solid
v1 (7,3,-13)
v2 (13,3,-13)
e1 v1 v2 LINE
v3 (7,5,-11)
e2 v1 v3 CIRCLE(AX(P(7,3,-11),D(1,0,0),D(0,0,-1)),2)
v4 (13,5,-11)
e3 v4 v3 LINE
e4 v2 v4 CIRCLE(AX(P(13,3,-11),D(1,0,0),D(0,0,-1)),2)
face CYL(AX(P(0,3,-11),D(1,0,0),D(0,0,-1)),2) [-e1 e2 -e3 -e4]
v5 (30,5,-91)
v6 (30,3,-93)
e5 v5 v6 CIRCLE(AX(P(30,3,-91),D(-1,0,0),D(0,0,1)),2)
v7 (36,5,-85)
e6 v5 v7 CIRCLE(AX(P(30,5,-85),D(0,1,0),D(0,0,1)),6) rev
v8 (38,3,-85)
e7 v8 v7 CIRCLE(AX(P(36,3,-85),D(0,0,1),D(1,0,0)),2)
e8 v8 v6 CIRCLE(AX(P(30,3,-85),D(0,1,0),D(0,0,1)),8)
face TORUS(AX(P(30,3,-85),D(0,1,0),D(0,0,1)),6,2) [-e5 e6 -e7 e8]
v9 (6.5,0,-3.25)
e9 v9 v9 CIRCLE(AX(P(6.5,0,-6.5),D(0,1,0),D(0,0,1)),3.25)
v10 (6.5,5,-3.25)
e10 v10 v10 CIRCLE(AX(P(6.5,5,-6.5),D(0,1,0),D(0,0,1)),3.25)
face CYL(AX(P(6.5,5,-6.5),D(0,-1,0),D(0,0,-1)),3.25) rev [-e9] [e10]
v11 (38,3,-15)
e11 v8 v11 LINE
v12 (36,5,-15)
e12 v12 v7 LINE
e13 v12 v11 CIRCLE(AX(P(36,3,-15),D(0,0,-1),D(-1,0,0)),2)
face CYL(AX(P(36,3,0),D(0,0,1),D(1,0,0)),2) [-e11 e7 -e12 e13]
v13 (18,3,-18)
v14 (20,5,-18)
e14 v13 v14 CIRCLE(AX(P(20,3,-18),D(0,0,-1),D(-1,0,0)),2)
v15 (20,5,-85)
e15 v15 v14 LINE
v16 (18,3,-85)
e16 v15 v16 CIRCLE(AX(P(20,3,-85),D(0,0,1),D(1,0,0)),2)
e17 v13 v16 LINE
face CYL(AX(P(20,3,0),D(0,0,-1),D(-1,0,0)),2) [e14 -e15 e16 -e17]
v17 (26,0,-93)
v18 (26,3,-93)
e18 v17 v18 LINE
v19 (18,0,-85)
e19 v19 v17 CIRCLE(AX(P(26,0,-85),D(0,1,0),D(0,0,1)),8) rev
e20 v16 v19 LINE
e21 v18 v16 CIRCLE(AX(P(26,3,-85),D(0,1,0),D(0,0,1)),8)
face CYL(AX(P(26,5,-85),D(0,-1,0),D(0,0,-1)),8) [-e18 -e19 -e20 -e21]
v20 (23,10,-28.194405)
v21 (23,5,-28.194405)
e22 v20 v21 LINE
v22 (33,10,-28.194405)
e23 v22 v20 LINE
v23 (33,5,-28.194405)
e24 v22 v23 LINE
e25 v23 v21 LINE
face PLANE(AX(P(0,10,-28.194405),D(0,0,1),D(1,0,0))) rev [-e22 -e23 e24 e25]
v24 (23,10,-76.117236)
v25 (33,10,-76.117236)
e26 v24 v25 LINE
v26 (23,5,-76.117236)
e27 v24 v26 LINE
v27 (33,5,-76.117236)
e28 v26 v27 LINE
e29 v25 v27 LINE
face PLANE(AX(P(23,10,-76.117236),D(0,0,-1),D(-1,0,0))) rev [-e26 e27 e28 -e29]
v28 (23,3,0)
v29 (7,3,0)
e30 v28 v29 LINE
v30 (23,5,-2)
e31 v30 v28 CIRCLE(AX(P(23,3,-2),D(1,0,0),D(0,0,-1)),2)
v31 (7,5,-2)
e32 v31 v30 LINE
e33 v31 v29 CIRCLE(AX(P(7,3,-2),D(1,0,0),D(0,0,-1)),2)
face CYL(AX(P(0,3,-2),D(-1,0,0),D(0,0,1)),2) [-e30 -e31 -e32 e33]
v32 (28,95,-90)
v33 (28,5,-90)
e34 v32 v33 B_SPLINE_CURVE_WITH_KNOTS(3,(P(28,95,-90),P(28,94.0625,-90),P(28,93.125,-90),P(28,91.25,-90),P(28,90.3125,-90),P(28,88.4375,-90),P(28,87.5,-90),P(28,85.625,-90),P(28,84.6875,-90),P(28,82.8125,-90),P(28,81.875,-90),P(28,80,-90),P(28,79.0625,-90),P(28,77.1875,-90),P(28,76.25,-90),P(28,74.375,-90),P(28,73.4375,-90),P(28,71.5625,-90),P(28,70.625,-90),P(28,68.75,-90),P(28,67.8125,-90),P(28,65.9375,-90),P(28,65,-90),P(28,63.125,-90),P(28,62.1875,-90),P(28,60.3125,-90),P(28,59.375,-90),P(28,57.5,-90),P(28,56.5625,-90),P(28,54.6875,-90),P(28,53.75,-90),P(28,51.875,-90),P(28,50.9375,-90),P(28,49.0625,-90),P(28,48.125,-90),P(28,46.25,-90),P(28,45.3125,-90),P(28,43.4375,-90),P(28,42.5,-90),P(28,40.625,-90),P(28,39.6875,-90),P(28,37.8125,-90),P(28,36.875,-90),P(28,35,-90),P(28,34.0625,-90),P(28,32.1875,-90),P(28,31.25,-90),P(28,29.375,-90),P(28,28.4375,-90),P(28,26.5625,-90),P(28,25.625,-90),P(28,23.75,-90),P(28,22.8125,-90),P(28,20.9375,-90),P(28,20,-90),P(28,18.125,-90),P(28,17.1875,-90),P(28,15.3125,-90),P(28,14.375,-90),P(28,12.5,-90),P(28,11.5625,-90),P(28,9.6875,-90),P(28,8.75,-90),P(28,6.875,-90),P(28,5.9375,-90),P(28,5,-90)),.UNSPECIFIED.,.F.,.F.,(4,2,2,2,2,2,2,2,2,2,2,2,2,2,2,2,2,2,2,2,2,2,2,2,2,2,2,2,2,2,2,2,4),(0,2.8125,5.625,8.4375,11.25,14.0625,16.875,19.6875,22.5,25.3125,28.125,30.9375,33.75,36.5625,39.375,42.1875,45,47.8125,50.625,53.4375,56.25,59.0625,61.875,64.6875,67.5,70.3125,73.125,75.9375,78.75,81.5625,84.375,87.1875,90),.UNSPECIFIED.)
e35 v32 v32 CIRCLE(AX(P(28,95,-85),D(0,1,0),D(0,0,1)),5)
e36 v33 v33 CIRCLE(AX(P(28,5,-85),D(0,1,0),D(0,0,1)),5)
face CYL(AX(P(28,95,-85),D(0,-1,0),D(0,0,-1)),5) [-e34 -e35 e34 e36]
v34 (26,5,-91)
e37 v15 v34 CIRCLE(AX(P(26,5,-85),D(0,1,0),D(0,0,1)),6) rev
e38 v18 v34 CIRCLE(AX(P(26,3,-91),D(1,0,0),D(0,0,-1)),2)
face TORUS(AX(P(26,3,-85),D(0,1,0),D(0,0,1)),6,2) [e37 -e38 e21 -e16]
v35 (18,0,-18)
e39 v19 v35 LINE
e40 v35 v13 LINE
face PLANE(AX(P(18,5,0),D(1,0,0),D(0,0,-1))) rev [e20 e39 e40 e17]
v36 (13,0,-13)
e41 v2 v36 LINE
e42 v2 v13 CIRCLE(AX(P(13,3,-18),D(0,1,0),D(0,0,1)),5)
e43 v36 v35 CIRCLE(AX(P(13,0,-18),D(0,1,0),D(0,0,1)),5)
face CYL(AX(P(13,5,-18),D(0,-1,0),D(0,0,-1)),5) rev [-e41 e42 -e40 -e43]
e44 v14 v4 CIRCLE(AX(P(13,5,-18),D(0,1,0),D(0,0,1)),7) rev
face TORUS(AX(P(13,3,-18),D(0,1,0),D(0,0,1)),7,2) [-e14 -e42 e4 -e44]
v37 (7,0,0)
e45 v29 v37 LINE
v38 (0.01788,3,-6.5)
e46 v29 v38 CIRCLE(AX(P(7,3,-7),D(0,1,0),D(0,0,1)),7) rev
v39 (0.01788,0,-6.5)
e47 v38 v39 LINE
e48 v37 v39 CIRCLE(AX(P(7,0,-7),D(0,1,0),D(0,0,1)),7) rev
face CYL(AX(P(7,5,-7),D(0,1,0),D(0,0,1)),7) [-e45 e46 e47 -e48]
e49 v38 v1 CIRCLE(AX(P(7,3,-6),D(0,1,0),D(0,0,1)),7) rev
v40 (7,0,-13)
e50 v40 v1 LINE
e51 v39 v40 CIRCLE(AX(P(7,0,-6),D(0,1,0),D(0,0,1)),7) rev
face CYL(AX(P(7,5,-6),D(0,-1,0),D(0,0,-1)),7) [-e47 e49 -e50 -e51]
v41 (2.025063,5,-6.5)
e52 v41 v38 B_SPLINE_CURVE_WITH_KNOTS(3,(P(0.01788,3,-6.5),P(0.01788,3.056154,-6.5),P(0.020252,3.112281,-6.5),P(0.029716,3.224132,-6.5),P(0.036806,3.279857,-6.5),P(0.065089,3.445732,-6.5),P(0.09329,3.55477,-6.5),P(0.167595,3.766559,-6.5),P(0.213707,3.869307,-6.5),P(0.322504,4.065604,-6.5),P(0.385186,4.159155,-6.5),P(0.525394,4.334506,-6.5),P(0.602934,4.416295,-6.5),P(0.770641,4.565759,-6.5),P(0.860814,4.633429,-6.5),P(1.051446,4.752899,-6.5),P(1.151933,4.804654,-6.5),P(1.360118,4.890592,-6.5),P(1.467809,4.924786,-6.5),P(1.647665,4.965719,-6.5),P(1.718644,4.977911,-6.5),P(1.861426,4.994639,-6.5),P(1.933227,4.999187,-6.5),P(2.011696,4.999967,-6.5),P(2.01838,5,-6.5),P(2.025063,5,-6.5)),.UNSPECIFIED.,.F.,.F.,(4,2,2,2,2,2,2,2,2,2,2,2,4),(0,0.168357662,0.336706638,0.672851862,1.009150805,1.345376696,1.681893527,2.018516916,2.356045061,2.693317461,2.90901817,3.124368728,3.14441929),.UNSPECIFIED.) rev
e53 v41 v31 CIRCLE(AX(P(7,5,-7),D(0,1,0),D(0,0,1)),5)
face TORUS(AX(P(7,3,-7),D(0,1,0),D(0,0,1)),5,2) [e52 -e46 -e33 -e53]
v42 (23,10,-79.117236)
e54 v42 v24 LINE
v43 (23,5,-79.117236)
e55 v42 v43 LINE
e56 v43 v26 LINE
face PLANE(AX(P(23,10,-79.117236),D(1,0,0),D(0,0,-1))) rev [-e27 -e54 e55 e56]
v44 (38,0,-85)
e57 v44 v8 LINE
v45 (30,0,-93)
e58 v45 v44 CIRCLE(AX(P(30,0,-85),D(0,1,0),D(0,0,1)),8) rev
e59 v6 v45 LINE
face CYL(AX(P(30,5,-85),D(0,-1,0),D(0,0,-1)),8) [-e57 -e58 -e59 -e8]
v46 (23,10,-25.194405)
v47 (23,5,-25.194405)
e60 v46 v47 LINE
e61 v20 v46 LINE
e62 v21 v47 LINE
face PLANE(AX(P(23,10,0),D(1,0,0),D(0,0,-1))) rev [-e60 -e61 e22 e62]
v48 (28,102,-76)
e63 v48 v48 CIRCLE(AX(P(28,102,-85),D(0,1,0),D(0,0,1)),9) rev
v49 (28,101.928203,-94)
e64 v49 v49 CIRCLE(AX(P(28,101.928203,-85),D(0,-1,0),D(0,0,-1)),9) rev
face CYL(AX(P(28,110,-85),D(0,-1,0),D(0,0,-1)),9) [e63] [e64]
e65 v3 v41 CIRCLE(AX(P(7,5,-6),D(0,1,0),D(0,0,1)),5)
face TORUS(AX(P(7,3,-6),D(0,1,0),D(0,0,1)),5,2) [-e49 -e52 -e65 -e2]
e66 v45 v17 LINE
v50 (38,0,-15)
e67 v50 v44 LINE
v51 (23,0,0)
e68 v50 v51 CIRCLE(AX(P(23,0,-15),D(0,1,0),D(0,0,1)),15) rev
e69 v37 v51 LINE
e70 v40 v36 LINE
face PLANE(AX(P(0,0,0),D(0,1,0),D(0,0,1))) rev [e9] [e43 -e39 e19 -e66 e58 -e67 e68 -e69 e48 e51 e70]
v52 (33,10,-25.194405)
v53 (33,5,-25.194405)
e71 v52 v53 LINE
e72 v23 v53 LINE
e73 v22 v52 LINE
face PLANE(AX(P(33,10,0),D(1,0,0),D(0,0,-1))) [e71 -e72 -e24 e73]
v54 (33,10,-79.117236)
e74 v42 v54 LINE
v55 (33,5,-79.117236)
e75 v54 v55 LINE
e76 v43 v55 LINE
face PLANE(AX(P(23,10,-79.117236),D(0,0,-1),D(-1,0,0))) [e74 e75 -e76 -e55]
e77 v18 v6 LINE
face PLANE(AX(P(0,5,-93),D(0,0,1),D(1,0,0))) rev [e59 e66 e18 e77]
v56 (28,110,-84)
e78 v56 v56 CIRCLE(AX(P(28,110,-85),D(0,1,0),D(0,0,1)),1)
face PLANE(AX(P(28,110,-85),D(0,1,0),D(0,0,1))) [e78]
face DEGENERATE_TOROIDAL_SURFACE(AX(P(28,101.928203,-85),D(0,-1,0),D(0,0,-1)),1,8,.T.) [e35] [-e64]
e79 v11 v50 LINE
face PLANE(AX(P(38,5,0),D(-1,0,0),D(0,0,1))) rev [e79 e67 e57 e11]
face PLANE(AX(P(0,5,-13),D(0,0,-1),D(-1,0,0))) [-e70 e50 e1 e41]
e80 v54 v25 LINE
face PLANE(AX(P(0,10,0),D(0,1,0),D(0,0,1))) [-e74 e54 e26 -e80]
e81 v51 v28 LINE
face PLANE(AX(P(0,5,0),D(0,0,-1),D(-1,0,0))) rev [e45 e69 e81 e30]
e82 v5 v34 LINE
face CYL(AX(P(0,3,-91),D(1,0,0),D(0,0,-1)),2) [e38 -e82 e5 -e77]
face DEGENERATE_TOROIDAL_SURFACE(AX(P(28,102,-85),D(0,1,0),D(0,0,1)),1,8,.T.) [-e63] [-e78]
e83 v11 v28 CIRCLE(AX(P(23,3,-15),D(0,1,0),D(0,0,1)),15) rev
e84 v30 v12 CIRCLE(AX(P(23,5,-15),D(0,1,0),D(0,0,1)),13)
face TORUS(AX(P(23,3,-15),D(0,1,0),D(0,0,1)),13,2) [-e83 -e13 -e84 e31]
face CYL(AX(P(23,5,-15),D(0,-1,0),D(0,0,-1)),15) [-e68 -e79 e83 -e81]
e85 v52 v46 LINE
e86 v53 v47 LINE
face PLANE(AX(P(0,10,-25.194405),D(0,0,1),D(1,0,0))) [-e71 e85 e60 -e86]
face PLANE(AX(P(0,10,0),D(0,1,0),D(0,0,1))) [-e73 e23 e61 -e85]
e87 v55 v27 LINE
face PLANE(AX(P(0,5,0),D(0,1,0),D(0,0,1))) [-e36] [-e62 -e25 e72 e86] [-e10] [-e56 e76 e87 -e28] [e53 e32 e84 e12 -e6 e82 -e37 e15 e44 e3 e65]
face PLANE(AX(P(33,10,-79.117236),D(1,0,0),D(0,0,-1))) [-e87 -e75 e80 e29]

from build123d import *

# Parameters (mm, degrees)
SKETCH2_W           = 13
SKETCH2_H           = 13
SKETCH2_R           = 3.25
BOSS_EXTRUDE2_DEPTH = 5
FILLET1_R           = 15
FILLET2_R           = 5
FILLET3_R           = 7
FILLET4_R           = 2
FILLET5_R           = 8
SKETCH4_R           = 5
BOSS_EXTRUDE4_DEPTH = 90
SKETCH5_R           = 9
BOSS_EXTRUDE5_DEPTH = 15
FILLET6_R           = 8
SKETCH6_W           = 10
SKETCH6_H           = 1.5
BOSS_EXTRUDE6_DEPTH = 5
SKETCH7_W           = 10
SKETCH7_H           = 3
BOSS_EXTRUDE7_DEPTH = 5


with BuildPart() as part:
    # Sketch2 → Boss-Extrude2 (new body)
    # profile 1 of 2: a face of its own
    with BuildSketch(Plane(origin=(0, 0, 0), x_dir=(1, 0, 0), z_dir=(0, 1, 0))):
        with Locations((6.5, 6.5)):
            Rectangle(SKETCH2_W, SKETCH2_H)
        with Locations(Location((6.5, 6.5, 0), (0, 0, 270))):
            Circle(SKETCH2_R, mode=Mode.SUBTRACT)
    # profile 2 of 2: a face of its own
    with BuildSketch(Plane(origin=(0, 0, 0), x_dir=(1, 0, 0), z_dir=(0, 1, 0))):
        Polygon((13, 13), (13, 0), (38, 0), (38, 93), (18, 93), (18, 13), align=None)
    extrude(amount=BOSS_EXTRUDE2_DEPTH)

    # Fillet1
    fillet1_edges = [part.edges().sort_by_distance(p)[0] for p in [
        (38, 2.5, 0),
    ]]
    fillet(fillet1_edges, radius=FILLET1_R)

    # Fillet2
    fillet2_edges = [part.edges().sort_by_distance(p)[0] for p in [
        (18, 2.5, -13),
    ]]
    fillet(fillet2_edges, radius=FILLET2_R)

    # Fillet3
    # the kernel refuses this fillet: 7 mm, written as the material it takes off along each edge
    with BuildSketch(Plane(origin=(0, -17.5, 0), x_dir=(0, 0, -1), z_dir=(0, 1, 0)), Plane(origin=(0, -17.5, -13), x_dir=(1, 0, 0), z_dir=(0, 1, 0))) as fillet3_piece_1:
        with BuildLine():
            CenterArc((FILLET3_R, -FILLET3_R), FILLET3_R, 90, 90)
            Line((0, -FILLET3_R), (0, 0))
            Line((0, 0), (FILLET3_R, 0))
        make_face()
    extrude(amount=40, mode=Mode.SUBTRACT)

    # Fillet4
    # the kernel refuses this fillet: 2 mm, written as the material it takes off along each edge
    with BuildSketch(Plane(origin=(43, 5, -93), x_dir=(0, 0, 1), z_dir=(-1, 0, 0))) as fillet4_piece_1:
        with BuildLine():
            CenterArc((FILLET4_R, -FILLET4_R), FILLET4_R, 90, 90)
            Line((0, -FILLET4_R), (0, 0))
            Line((0, 0), (FILLET4_R, 0))
        make_face()
    extrude(amount=30, mode=Mode.SUBTRACT)
    with BuildSketch(Plane(origin=(18, 5, -98), x_dir=(1, 0, 0), z_dir=(0, 0, 1))) as fillet4_piece_2:
        with BuildLine():
            CenterArc((FILLET4_R, -FILLET4_R), FILLET4_R, 90, 90)
            Line((0, -FILLET4_R), (0, 0))
            Line((0, 0), (FILLET4_R, 0))
        make_face()
    extrude(amount=80, mode=Mode.SUBTRACT)
    with BuildSketch(Plane(origin=(38, 5, -15), x_dir=(-1, 0, 0), z_dir=(0, 0, -1))) as fillet4_piece_3:
        with BuildLine():
            CenterArc((FILLET4_R, -FILLET4_R), FILLET4_R, 90, 90)
            Line((0, -FILLET4_R), (0, 0))
            Line((0, 0), (FILLET4_R, 0))
        make_face()
    extrude(amount=83, mode=Mode.SUBTRACT)
    with BuildSketch(Plane(origin=(23, 5, -15), x_dir=(1, 0, 0), z_dir=(0, 0, -1))) as fillet4_piece_4:
        with BuildLine():
            CenterArc((15 - FILLET4_R, FILLET4_R), FILLET4_R, 270, 90)
            Line((15, FILLET4_R), (15, 0))
            Line((15, 0), (15 - FILLET4_R, 0))
        make_face()
    revolve(axis=Axis((23, 5, -15), (0, -1, 0)), revolution_arc=90, mode=Mode.SUBTRACT)
    with BuildSketch(Plane(origin=(13, 5, -18), x_dir=(0, 0, 1), z_dir=(-1, 0, 0))) as fillet4_piece_5:
        with BuildLine():
            CenterArc((5 + FILLET4_R, -FILLET4_R), FILLET4_R, 90, 90)
            Line((5, -FILLET4_R), (5, 0))
            Line((5, 0), (5 + FILLET4_R, 0))
        make_face()
    revolve(axis=Axis((13, 5, -18), (0, 1, 0)), revolution_arc=90, mode=Mode.SUBTRACT)
    with BuildSketch(Plane(origin=(23, 5, 0), x_dir=(0, 0, -1), z_dir=(-1, 0, 0))) as fillet4_piece_6:
        with BuildLine():
            CenterArc((FILLET4_R, FILLET4_R), FILLET4_R, 180, 90)
            Line((0, FILLET4_R), (0, 0))
            Line((0, 0), (FILLET4_R, 0))
        make_face()
    extrude(amount=16, mode=Mode.SUBTRACT)
    with BuildSketch(Plane(origin=(7, 5, -13), x_dir=(0, 0, 1), z_dir=(1, 0, 0))) as fillet4_piece_7:
        with BuildLine():
            CenterArc((FILLET4_R, FILLET4_R), FILLET4_R, 180, 90)
            Line((0, FILLET4_R), (0, 0))
            Line((0, 0), (FILLET4_R, 0))
        make_face()
    extrude(amount=6, mode=Mode.SUBTRACT)
    with BuildSketch(Plane(origin=(7, 5, -6), x_dir=(-0.8002659852705738, 0, 0.5996451891067899), z_dir=(0.5996451891067899, 0, 0.8002659852705738))) as fillet4_piece_8:
        with BuildLine():
            CenterArc((7 - FILLET4_R, FILLET4_R), FILLET4_R, 270, 90)
            Line((7, FILLET4_R), (7, 0))
            Line((7, 0), (7 - FILLET4_R, 0))
        make_face()
    revolve(axis=Axis((7, 5, -6), (0, -1, 0)), revolution_arc=126.844490412, mode=Mode.SUBTRACT)
    with BuildSketch(Plane(origin=(7, 5, -7), x_dir=(0, 0, 1), z_dir=(1, 0, 0))) as fillet4_piece_9:
        with BuildLine():
            CenterArc((7 - FILLET4_R, FILLET4_R), FILLET4_R, 270, 90)
            Line((7, FILLET4_R), (7, 0))
            Line((7, 0), (7 - FILLET4_R, 0))
        make_face()
    revolve(axis=Axis((7, 5, -7), (0, -1, 0)), revolution_arc=126.844490412, mode=Mode.SUBTRACT)

    # Fillet5
    # the kernel refuses this fillet: 8 mm, written as the material it takes off along each edge
    with BuildSketch(Plane(origin=(26, 5, -85), x_dir=(0, 0, -1), z_dir=(1, 0, 0))) as fillet5_piece_1:
        with BuildLine():
            CenterArc((6, -2), 2, 0, 90)
            Line((8, -2), (8, 0))
            Line((8, 0), (6, 0))
        make_face()
    revolve(axis=Axis((26, 5, -85), (0, 1, 0)), revolution_arc=90, mode=Mode.SUBTRACT)
    with BuildSketch(Plane(origin=(30, 5, -85), x_dir=(1, 0, 0), z_dir=(0, 0, 1))) as fillet5_piece_2:
        with BuildLine():
            CenterArc((6, -2), 2, 0, 90)
            Line((8, -2), (8, 0))
            Line((8, 0), (6, 0))
        make_face()
    revolve(axis=Axis((30, 5, -85), (0, 1, 0)), revolution_arc=90, mode=Mode.SUBTRACT)
    with BuildSketch(Plane(origin=(38, -20, -93), x_dir=(-1, 0, 0), z_dir=(0, 1, 0)), Plane(origin=(18, -20, -93), x_dir=(0, 0, 1), z_dir=(0, 1, 0))) as fillet5_piece_3:
        with BuildLine():
            CenterArc((FILLET5_R, FILLET5_R), FILLET5_R, 180, 90)
            Line((0, FILLET5_R), (0, 0))
            Line((0, 0), (FILLET5_R, 0))
        make_face()
    extrude(amount=25, mode=Mode.SUBTRACT)

    # Sketch4 → Boss-Extrude4 (add)
    with BuildSketch(Plane(origin=(0, 5, 0), x_dir=(1, 0, 0), z_dir=(0, 1, 0))):
        with Locations(Location((28, 85, 0), (0, 0, 90))):
            Circle(SKETCH4_R)
    extrude(amount=BOSS_EXTRUDE4_DEPTH)

    # Sketch5 → Boss-Extrude5 (add)
    with BuildSketch(Plane(origin=(0, 95, 0), x_dir=(1, 0, 0), z_dir=(0, 1, 0))):
        with Locations(Location((28, 85, 0), (0, 0, 270))):
            Circle(SKETCH5_R)
    extrude(amount=BOSS_EXTRUDE5_DEPTH)

    # Fillet6
    # the kernel refuses this fillet: 8 mm, written as the material it takes off along each edge
    with BuildSketch(Plane(origin=(28, 95, -85), x_dir=(0, 0, 1), z_dir=(-1, 0, 0))) as fillet6_piece_1:
        with BuildLine():
            CenterArc((1, 6.92820323), FILLET6_R, 300, 60)
            Line((5, 0), (5.08, -0.138564065))
            ThreePointArc((5.08, -0.138564065), (7, -0.16), (9, -0.16))
            Line((9, -0.16), (9.16, 0))
            Line((9.16, 0), (9.16, 6.92820323))
            Line((9.16, 6.92820323), (9, 6.92820323))
        make_face()
    revolve(axis=Axis((28, 95, -85), (0, 1, 0)), mode=Mode.SUBTRACT)
    with BuildSketch(Plane(origin=(28, 110, -85), x_dir=(0, 0, 1), z_dir=(-1, 0, 0))) as fillet6_piece_2:
        with BuildLine():
            CenterArc((9 - FILLET6_R, -FILLET6_R), FILLET6_R, 0, 90)
            Line((9 - FILLET6_R, 0), (9 - FILLET6_R, FILLET6_R * 0.02))
            Line((9 - FILLET6_R, FILLET6_R * 0.02), (9 + FILLET6_R * 0.02, FILLET6_R * 0.02))
            Line((9 + FILLET6_R * 0.02, FILLET6_R * 0.02), (9 + FILLET6_R * 0.02, -FILLET6_R))
            Line((9 + FILLET6_R * 0.02, -FILLET6_R), (9, -FILLET6_R))
        make_face()
    revolve(axis=Axis((28, 110, -85), (0, 1, 0)), mode=Mode.SUBTRACT)

    # Sketch6 → Boss-Extrude6 (add)
    with BuildSketch(Plane(origin=(0, 5, 0), x_dir=(1, 0, 0), z_dir=(0, 1, 0))):
        with Locations((28, 25.944405325)):
            Rectangle(SKETCH6_W, SKETCH6_H)
        with Locations((28, 27.444405325)):
            Rectangle(SKETCH6_W, SKETCH6_H)
    extrude(amount=BOSS_EXTRUDE6_DEPTH)

    # Sketch7 → Boss-Extrude7 (add)
    with BuildSketch(Plane(origin=(0, 5, 0), x_dir=(1, 0, 0), z_dir=(0, 1, 0))):
        with Locations((28, 77.6172361)):
            Rectangle(SKETCH7_W, SKETCH7_H)
    extrude(amount=BOSS_EXTRUDE7_DEPTH)


solid = part.part
